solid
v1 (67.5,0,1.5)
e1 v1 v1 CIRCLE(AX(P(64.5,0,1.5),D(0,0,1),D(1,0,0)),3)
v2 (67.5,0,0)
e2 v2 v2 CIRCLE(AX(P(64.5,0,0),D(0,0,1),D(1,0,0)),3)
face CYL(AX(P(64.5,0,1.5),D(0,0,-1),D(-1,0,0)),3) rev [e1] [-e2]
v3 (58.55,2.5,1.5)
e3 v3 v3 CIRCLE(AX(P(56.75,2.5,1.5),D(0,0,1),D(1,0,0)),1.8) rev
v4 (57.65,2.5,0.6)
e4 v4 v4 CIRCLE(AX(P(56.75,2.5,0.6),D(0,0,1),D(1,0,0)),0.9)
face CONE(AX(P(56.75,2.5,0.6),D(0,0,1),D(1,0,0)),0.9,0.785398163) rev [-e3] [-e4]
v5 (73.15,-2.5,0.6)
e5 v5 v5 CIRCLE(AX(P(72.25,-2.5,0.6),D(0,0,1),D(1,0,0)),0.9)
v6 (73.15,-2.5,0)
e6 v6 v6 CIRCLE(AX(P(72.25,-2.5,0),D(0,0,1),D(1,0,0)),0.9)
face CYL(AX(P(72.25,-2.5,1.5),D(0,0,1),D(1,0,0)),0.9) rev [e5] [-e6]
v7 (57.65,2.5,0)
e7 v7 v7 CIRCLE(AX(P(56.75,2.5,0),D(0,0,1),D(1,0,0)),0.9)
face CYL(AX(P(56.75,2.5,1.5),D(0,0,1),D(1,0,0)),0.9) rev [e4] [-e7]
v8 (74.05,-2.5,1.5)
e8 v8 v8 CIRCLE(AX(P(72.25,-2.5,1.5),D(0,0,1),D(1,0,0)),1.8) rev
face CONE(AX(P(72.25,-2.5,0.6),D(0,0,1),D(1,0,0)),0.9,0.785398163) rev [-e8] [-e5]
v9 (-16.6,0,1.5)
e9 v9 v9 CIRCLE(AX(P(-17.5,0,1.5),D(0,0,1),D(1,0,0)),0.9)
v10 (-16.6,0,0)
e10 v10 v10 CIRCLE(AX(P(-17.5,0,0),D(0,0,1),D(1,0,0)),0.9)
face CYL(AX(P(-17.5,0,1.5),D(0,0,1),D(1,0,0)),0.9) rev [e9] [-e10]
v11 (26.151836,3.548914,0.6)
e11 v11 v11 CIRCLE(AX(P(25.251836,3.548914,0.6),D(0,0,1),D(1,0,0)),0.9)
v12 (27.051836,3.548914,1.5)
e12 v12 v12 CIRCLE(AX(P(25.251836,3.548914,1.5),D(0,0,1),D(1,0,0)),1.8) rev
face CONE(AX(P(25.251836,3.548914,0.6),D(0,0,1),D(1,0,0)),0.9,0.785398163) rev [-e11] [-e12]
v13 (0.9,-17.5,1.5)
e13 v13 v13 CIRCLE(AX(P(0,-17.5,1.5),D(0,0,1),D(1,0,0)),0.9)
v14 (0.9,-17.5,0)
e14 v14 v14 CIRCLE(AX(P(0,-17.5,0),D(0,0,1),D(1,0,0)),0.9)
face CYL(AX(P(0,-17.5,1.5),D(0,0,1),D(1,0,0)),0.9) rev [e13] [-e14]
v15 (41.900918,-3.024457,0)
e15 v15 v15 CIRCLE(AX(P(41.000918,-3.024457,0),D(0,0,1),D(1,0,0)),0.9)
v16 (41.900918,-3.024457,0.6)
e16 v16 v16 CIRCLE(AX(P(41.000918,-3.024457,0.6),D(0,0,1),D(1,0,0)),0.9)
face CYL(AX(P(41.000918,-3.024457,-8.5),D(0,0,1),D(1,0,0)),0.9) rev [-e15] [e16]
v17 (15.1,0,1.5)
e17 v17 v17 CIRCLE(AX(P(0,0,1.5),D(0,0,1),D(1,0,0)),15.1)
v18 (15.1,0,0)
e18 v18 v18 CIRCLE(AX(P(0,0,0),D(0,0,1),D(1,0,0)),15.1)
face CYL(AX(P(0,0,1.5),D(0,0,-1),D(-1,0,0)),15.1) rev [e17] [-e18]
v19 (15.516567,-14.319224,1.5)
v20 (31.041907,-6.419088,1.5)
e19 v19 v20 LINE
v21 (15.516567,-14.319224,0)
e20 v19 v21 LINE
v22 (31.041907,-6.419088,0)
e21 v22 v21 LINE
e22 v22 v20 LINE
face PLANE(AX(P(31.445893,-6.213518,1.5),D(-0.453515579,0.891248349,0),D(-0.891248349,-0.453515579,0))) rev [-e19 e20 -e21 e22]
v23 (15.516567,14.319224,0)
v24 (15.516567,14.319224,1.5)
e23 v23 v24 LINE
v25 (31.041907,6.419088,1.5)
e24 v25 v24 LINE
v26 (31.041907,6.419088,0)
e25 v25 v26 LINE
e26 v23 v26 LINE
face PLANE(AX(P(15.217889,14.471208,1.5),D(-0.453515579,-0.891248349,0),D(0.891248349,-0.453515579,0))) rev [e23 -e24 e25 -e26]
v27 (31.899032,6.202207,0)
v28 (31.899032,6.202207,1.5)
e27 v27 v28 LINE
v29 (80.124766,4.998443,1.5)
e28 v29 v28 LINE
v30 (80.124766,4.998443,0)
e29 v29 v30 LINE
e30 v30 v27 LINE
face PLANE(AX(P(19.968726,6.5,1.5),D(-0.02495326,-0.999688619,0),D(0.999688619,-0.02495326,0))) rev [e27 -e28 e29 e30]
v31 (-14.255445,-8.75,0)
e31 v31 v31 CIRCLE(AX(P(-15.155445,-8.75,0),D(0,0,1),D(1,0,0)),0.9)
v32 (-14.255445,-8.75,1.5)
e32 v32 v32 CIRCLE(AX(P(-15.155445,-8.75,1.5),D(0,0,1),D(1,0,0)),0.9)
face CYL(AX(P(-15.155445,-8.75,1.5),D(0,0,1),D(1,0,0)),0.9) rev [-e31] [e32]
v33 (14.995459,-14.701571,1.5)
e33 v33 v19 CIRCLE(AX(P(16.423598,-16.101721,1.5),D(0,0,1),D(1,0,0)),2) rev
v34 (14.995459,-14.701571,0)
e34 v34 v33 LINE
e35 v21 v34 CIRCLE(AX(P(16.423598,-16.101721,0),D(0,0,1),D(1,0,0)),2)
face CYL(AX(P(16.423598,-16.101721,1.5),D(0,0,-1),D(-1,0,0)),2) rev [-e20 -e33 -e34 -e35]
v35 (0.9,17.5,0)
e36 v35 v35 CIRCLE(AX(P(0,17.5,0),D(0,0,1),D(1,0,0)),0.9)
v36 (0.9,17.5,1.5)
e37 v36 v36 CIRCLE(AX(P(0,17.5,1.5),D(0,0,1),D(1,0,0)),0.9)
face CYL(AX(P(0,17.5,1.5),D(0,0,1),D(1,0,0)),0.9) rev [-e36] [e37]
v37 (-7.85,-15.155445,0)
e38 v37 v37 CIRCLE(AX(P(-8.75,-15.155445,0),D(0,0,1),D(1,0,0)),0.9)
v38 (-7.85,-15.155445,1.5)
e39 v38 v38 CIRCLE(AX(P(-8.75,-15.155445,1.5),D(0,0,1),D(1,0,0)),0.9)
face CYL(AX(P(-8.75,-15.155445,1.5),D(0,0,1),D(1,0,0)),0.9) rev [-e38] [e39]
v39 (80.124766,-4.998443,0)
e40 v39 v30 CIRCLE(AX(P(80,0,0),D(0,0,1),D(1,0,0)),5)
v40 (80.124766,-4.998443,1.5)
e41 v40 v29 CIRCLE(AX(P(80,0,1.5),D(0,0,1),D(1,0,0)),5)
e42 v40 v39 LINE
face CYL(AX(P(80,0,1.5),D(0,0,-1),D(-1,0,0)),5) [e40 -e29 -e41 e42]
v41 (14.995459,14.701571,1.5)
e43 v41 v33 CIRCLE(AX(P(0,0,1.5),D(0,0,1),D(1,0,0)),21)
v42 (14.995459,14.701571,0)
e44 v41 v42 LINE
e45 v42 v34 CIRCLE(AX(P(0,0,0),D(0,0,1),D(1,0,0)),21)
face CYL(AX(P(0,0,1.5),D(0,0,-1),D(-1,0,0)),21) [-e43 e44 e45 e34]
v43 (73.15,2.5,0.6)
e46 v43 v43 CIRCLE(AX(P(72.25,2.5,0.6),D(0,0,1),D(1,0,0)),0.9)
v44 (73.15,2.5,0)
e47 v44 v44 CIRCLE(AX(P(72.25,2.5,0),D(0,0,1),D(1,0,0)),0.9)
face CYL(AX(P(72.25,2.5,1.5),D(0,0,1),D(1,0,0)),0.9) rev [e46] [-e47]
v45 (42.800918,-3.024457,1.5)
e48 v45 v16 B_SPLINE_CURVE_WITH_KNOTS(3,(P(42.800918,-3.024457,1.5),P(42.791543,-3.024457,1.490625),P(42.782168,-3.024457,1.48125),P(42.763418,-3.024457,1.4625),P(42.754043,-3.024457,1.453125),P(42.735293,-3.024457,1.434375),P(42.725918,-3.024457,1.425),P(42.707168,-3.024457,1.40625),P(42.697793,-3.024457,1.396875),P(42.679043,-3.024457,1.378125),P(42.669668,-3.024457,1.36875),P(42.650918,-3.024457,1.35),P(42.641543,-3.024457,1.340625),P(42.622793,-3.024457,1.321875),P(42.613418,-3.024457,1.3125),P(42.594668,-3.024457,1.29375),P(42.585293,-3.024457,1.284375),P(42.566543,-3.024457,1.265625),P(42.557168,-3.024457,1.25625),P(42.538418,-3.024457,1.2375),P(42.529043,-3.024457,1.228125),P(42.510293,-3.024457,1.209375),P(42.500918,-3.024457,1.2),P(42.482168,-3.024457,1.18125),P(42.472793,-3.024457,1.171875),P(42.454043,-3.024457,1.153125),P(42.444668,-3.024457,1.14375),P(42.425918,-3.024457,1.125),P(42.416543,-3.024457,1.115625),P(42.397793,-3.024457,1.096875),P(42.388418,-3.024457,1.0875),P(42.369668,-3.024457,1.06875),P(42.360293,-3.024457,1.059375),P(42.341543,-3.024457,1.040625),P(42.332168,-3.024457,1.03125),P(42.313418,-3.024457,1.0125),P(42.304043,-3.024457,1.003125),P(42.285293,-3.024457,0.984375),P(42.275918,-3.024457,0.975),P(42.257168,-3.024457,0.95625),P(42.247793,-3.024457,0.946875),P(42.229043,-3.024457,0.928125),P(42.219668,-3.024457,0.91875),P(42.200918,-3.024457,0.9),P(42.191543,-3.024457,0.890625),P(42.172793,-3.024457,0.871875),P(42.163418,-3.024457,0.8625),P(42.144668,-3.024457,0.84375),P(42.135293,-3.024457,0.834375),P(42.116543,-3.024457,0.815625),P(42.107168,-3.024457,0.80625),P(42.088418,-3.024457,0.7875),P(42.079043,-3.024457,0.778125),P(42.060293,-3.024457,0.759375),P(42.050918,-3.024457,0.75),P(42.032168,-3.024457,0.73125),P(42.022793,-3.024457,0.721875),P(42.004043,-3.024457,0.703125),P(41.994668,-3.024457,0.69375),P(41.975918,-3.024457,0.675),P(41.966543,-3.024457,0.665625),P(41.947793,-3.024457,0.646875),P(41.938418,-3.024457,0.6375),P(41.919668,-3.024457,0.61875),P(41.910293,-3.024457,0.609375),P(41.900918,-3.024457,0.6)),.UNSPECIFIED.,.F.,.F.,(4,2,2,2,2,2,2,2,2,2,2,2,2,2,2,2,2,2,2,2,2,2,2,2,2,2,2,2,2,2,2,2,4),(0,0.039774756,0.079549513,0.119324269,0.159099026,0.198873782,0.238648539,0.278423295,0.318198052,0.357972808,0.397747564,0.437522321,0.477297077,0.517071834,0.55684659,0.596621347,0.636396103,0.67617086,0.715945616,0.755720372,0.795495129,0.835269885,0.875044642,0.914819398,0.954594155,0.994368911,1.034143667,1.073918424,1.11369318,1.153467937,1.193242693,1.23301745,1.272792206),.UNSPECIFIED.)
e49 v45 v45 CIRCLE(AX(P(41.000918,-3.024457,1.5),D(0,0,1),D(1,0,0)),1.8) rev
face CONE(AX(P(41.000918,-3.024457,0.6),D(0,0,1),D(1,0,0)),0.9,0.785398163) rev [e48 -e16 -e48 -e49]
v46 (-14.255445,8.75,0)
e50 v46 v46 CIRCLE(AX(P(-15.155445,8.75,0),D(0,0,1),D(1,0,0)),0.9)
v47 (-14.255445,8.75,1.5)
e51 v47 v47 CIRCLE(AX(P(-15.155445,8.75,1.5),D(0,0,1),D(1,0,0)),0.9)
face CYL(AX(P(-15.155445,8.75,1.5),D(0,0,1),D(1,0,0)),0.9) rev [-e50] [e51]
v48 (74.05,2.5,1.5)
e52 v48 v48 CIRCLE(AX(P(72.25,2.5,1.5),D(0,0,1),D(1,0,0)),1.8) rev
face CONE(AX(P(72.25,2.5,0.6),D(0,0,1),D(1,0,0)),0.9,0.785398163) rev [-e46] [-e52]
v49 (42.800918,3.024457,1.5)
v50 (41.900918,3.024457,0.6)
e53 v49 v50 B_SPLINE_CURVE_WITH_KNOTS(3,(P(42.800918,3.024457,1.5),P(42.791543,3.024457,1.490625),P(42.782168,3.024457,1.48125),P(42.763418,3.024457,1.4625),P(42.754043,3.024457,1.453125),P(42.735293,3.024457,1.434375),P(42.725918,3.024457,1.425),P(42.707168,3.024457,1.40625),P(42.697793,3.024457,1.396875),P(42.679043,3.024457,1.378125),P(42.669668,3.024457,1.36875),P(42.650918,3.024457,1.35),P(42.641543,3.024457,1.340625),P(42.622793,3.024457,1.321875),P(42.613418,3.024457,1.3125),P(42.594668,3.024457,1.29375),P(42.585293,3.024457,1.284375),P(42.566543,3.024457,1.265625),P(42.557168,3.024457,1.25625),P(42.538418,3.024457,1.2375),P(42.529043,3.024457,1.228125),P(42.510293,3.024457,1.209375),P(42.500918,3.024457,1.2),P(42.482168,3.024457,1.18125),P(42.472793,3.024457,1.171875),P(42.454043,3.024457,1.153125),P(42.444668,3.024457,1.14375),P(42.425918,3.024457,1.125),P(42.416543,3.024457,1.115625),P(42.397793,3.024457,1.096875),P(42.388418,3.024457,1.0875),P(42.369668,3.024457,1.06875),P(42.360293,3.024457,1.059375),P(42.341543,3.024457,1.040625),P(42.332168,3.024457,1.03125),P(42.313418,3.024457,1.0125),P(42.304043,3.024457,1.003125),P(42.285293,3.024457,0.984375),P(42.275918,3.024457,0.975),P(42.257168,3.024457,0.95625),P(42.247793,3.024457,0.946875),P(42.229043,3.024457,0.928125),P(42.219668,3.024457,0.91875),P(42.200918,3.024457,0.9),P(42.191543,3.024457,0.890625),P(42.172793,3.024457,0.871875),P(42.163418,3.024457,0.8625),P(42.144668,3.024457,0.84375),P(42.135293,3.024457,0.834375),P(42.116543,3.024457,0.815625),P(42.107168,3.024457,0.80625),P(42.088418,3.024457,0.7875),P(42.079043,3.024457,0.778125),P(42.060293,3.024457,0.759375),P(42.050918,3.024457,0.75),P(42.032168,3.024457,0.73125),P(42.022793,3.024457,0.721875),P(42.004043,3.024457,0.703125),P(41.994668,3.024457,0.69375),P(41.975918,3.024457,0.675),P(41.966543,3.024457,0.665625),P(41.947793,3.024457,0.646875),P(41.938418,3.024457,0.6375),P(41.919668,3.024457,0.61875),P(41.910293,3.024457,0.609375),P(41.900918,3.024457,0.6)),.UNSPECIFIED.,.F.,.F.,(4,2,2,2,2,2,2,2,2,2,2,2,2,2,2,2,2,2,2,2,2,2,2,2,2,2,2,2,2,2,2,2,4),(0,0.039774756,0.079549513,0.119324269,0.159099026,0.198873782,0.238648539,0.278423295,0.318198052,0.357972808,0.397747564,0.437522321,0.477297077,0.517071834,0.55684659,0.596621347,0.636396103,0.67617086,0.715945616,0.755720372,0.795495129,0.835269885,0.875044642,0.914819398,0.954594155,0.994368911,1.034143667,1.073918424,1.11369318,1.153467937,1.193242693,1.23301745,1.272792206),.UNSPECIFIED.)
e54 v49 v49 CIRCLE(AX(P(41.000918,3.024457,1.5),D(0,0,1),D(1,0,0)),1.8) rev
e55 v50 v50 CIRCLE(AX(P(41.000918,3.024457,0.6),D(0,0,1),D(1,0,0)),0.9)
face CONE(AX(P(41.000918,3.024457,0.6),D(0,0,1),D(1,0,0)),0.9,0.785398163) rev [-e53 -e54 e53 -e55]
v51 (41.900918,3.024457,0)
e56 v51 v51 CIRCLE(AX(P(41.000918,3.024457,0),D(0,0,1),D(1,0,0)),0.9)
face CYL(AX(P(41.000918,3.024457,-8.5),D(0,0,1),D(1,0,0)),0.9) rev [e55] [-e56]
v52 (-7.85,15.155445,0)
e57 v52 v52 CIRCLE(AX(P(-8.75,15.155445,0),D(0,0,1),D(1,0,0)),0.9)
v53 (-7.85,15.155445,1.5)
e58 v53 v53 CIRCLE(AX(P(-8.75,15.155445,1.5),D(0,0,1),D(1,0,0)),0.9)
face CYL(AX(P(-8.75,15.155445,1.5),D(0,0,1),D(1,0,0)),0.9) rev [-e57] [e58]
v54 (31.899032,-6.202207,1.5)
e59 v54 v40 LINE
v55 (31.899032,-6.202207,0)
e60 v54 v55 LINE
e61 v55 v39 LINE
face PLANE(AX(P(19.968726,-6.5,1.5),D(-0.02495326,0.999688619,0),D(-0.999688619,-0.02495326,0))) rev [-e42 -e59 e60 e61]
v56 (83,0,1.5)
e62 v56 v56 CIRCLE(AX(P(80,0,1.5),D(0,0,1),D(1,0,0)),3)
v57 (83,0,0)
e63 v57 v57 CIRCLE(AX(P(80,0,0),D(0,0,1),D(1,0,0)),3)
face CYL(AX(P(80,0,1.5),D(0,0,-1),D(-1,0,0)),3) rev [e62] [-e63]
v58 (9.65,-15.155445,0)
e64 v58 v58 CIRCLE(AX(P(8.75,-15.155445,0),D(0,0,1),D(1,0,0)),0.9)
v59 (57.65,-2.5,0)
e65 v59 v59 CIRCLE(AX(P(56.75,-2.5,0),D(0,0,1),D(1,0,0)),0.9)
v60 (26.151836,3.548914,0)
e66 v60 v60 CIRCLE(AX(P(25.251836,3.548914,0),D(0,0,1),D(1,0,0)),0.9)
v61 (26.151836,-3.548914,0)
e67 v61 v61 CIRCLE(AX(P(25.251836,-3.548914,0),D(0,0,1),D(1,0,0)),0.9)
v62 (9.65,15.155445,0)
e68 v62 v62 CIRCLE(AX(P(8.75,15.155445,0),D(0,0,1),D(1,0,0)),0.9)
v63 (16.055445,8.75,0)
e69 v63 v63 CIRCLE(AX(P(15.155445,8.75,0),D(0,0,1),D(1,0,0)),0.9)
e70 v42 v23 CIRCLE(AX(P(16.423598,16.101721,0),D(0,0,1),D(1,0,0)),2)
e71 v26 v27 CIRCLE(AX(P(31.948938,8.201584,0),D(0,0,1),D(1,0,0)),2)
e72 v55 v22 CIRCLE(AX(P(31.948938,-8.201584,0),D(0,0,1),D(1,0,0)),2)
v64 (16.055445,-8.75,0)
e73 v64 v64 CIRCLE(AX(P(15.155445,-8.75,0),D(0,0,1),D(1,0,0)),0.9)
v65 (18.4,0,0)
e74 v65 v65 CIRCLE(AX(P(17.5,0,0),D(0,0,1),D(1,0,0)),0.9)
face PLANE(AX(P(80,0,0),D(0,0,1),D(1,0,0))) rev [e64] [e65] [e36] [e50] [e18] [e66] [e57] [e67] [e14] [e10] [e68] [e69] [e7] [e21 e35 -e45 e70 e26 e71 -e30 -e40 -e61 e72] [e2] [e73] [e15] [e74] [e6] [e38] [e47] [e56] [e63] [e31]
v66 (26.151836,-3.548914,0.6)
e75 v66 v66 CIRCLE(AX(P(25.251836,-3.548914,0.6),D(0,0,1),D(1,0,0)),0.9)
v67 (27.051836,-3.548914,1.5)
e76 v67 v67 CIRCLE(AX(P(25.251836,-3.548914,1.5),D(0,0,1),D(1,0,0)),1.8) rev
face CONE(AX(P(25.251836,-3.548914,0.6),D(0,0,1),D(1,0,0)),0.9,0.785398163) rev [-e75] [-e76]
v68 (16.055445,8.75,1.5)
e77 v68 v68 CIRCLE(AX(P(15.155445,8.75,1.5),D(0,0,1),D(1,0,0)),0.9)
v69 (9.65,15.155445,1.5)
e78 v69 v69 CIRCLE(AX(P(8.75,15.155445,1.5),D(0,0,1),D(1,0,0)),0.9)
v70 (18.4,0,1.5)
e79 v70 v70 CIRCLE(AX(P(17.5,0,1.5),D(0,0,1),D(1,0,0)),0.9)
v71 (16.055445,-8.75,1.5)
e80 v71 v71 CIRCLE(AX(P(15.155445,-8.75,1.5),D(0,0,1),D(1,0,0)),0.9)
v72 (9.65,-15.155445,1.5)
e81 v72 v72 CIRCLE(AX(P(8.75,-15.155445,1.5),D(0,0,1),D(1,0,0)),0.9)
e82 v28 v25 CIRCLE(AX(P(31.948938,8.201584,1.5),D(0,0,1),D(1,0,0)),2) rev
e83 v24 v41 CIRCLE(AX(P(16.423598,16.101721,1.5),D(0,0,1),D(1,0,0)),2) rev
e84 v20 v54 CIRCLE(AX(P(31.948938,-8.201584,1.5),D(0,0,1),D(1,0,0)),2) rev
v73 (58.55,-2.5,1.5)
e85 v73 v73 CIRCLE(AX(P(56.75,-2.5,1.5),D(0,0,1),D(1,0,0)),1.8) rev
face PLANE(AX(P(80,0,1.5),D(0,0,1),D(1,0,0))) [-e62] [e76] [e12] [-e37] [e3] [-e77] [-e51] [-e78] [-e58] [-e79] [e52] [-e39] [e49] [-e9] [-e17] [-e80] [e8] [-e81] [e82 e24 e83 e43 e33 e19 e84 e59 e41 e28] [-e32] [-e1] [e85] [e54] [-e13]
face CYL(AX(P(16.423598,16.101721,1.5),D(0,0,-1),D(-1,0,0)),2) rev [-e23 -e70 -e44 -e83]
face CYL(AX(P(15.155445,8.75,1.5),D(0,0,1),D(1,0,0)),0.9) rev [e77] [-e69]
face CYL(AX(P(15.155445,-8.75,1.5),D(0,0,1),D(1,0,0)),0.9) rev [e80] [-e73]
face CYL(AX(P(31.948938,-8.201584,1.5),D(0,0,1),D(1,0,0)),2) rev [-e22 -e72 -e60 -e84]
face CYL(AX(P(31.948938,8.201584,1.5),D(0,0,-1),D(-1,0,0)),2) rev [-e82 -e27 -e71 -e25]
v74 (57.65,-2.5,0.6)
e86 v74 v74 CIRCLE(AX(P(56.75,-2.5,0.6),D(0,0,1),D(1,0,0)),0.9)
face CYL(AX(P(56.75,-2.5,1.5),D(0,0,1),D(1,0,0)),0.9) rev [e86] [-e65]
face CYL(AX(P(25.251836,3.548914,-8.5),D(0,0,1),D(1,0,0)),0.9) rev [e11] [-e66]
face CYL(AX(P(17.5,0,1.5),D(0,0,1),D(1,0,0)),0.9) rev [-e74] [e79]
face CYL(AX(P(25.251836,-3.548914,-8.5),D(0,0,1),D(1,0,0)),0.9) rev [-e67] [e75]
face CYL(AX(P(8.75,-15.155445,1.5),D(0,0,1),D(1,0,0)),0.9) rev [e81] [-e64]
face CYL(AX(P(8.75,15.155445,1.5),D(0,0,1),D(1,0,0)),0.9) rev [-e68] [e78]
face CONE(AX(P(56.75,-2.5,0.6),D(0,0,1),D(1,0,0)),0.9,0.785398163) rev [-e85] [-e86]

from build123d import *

# Parameters (mm, degrees)
SKETCH1_R               = 15.1
SKETCH1_R_2             = 3
BOSS_EXTRUDE1_DEPTH     = 1.5
D_GAGEMENT_M1_62_D      = 1.8
D_GAGEMENT_M1_62_DEPTH  = 11.5
CIRPATTERN1_COUNT       = 12
CHAMFER2_SIZE           = 11.480741847
FILLET4_R               = 2
D_GAGEMENT_M1_61_D      = 1.8
D_GAGEMENT_M1_61_DEPTH  = 11.5
CHAMFER3_SIZE           = 0.9
ESQUISSE1_R             = 0.9
ENL_V_MAT_EXTRU_1_DEPTH = 10
CHANFREIN1_SIZE         = 0.9
ESQUISSE2_R             = 0.9
ENL_V_MAT_EXTRU_2_DEPTH = 10
CHANFREIN2_SIZE         = 0.9


with BuildPart() as part:
    # Sketch1 → Boss-Extrude1 (new body)
    with BuildSketch(Plane.XY):
        with BuildLine():
            Line((19.968725548, 6.5), (80.124766302, 4.998443095))
            ThreePointArc((80.124766302, 4.998443095), (85, 0), (80.124766302, -4.998443095))
            Line((80.124766302, -4.998443095), (19.968725548, -6.5))
            ThreePointArc((19.968725548, -6.5), (-21, 0), (19.968725548, 6.5))
        make_face()
        Circle(SKETCH1_R, mode=Mode.SUBTRACT)
        with Locations((64.5, 0)):
            Circle(SKETCH1_R_2, mode=Mode.SUBTRACT)
        with Locations((80, 0)):
            Circle(SKETCH1_R_2, mode=Mode.SUBTRACT)
    extrude(amount=BOSS_EXTRUDE1_DEPTH)

    # Dégagement M1.62
    with Locations(Plane.XY.offset(1.5)):
        with Locations((0, 17.5)):
            d_gagement_m1_62 = Hole(D_GAGEMENT_M1_62_D / 2, depth=D_GAGEMENT_M1_62_DEPTH)

    # CirPattern1: Dégagement M1.62 ×12 about axis
    cirpattern1_axis = Axis((0, 0, 0), (0, 0, 1))
    for i in range(1, CIRPATTERN1_COUNT):
        add(d_gagement_m1_62.rotate(cirpattern1_axis, i * 360 / CIRPATTERN1_COUNT), mode=Mode.SUBTRACT)

    # Chamfer2
    # the kernel refuses this chamfer: 11.480741847, 7 mm, written as the material it adds along each edge
    with BuildSketch(Plane(origin=(19.968725548, -6.5, 0), x_dir=(-0.5119667812352321, -0.8590052473132141, 0), z_dir=(0, 0, 1))) as chamfer2_piece_1:
        with BuildLine():
            Line((9.279580073, 0), (-CHAMFER2_SIZE * 0.533242346076, CHAMFER2_SIZE * 0.845962528924))
            Line((-CHAMFER2_SIZE * 0.533242346076, CHAMFER2_SIZE * 0.845962528924), (0, 0))
            ThreePointArc((0, 0), (4.840122862, 0.518020319), (9.279580073, 0))
        make_face()
    extrude(amount=1.5)
    with BuildSketch(Plane(origin=(19.968725548, 6.5, 0), x_dir=(0.9996886189188567, -0.024953260390352783, 0), z_dir=(0, 0, 1))) as chamfer2_piece_2:
        with BuildLine():
            Line((CHAMFER2_SIZE, 0), (-4.948265049, 7.850177026))
            ThreePointArc((-4.948265049, 7.850177026), (-2.142732691, 4.370792947), (0, 0))
            Line((0, 0), (CHAMFER2_SIZE, 0))
        make_face()
    extrude(amount=1.5)

    # Fillet4
    fillet4_edges = [part.edges().sort_by_distance(p)[0] for p in [
        (31.445892509, -6.213518059, 0.75),
        (15.217888807, 14.471207976, 0.75),
        (15.217888807, -14.471207976, 0.75),
        (31.445892509, 6.213518059, 0.75),
    ]]
    fillet(fillet4_edges, radius=FILLET4_R)

    # Dégagement M1.61
    with Locations(Plane.XY.offset(1.5)):
        with Locations((56.75, 2.5), (72.25, 2.5), (72.25, -2.5), (56.75, -2.5)):
            Hole(D_GAGEMENT_M1_61_D / 2, depth=D_GAGEMENT_M1_61_DEPTH)

    # Chamfer3
    chamfer3_edges = [part.edges().sort_by_distance(p)[0] for p in [
        (57.65, -2.5, 1.5),
        (73.15, -2.5, 1.5),
        (73.15, 2.5, 1.5),
        (57.65, 2.5, 1.5),
    ]]
    chamfer(chamfer3_edges, length=CHAMFER3_SIZE)

    # Esquisse1 → Enlèv. mat.-Extru.1 (cut)
    with BuildSketch(Plane.XY.offset(1.5)):
        with Locations((25.251835753, 3.548914074)):
            Circle(ESQUISSE1_R)
        with Locations((25.251835753, -3.548914074)):
            Circle(ESQUISSE1_R)
    extrude(amount=-ENL_V_MAT_EXTRU_1_DEPTH, mode=Mode.SUBTRACT)

    # Chanfrein1
    chanfrein1_edges = [part.edges().sort_by_distance(p)[0] for p in [
        (24.351835753, 3.548914074, 1.5),
        (24.351835753, -3.548914074, 1.5),
    ]]
    chamfer(chanfrein1_edges, length=CHANFREIN1_SIZE)

    # Esquisse2 → Enlèv. mat.-Extru.2 (cut)
    with BuildSketch(Plane.XY.offset(1.5)):
        with Locations((41.000917876, 3.024457037)):
            Circle(ESQUISSE2_R)
        with Locations((41.000917876, -3.024457037)):
            Circle(ESQUISSE2_R)
    extrude(amount=-ENL_V_MAT_EXTRU_2_DEPTH, mode=Mode.SUBTRACT)

    # Chanfrein2
    chanfrein2_edges = [part.edges().sort_by_distance(p)[0] for p in [
        (40.100917876, 3.024457037, 1.5),
        (40.100917876, -3.024457037, 1.5),
    ]]
    chamfer(chanfrein2_edges, length=CHANFREIN2_SIZE)


solid = part.part
